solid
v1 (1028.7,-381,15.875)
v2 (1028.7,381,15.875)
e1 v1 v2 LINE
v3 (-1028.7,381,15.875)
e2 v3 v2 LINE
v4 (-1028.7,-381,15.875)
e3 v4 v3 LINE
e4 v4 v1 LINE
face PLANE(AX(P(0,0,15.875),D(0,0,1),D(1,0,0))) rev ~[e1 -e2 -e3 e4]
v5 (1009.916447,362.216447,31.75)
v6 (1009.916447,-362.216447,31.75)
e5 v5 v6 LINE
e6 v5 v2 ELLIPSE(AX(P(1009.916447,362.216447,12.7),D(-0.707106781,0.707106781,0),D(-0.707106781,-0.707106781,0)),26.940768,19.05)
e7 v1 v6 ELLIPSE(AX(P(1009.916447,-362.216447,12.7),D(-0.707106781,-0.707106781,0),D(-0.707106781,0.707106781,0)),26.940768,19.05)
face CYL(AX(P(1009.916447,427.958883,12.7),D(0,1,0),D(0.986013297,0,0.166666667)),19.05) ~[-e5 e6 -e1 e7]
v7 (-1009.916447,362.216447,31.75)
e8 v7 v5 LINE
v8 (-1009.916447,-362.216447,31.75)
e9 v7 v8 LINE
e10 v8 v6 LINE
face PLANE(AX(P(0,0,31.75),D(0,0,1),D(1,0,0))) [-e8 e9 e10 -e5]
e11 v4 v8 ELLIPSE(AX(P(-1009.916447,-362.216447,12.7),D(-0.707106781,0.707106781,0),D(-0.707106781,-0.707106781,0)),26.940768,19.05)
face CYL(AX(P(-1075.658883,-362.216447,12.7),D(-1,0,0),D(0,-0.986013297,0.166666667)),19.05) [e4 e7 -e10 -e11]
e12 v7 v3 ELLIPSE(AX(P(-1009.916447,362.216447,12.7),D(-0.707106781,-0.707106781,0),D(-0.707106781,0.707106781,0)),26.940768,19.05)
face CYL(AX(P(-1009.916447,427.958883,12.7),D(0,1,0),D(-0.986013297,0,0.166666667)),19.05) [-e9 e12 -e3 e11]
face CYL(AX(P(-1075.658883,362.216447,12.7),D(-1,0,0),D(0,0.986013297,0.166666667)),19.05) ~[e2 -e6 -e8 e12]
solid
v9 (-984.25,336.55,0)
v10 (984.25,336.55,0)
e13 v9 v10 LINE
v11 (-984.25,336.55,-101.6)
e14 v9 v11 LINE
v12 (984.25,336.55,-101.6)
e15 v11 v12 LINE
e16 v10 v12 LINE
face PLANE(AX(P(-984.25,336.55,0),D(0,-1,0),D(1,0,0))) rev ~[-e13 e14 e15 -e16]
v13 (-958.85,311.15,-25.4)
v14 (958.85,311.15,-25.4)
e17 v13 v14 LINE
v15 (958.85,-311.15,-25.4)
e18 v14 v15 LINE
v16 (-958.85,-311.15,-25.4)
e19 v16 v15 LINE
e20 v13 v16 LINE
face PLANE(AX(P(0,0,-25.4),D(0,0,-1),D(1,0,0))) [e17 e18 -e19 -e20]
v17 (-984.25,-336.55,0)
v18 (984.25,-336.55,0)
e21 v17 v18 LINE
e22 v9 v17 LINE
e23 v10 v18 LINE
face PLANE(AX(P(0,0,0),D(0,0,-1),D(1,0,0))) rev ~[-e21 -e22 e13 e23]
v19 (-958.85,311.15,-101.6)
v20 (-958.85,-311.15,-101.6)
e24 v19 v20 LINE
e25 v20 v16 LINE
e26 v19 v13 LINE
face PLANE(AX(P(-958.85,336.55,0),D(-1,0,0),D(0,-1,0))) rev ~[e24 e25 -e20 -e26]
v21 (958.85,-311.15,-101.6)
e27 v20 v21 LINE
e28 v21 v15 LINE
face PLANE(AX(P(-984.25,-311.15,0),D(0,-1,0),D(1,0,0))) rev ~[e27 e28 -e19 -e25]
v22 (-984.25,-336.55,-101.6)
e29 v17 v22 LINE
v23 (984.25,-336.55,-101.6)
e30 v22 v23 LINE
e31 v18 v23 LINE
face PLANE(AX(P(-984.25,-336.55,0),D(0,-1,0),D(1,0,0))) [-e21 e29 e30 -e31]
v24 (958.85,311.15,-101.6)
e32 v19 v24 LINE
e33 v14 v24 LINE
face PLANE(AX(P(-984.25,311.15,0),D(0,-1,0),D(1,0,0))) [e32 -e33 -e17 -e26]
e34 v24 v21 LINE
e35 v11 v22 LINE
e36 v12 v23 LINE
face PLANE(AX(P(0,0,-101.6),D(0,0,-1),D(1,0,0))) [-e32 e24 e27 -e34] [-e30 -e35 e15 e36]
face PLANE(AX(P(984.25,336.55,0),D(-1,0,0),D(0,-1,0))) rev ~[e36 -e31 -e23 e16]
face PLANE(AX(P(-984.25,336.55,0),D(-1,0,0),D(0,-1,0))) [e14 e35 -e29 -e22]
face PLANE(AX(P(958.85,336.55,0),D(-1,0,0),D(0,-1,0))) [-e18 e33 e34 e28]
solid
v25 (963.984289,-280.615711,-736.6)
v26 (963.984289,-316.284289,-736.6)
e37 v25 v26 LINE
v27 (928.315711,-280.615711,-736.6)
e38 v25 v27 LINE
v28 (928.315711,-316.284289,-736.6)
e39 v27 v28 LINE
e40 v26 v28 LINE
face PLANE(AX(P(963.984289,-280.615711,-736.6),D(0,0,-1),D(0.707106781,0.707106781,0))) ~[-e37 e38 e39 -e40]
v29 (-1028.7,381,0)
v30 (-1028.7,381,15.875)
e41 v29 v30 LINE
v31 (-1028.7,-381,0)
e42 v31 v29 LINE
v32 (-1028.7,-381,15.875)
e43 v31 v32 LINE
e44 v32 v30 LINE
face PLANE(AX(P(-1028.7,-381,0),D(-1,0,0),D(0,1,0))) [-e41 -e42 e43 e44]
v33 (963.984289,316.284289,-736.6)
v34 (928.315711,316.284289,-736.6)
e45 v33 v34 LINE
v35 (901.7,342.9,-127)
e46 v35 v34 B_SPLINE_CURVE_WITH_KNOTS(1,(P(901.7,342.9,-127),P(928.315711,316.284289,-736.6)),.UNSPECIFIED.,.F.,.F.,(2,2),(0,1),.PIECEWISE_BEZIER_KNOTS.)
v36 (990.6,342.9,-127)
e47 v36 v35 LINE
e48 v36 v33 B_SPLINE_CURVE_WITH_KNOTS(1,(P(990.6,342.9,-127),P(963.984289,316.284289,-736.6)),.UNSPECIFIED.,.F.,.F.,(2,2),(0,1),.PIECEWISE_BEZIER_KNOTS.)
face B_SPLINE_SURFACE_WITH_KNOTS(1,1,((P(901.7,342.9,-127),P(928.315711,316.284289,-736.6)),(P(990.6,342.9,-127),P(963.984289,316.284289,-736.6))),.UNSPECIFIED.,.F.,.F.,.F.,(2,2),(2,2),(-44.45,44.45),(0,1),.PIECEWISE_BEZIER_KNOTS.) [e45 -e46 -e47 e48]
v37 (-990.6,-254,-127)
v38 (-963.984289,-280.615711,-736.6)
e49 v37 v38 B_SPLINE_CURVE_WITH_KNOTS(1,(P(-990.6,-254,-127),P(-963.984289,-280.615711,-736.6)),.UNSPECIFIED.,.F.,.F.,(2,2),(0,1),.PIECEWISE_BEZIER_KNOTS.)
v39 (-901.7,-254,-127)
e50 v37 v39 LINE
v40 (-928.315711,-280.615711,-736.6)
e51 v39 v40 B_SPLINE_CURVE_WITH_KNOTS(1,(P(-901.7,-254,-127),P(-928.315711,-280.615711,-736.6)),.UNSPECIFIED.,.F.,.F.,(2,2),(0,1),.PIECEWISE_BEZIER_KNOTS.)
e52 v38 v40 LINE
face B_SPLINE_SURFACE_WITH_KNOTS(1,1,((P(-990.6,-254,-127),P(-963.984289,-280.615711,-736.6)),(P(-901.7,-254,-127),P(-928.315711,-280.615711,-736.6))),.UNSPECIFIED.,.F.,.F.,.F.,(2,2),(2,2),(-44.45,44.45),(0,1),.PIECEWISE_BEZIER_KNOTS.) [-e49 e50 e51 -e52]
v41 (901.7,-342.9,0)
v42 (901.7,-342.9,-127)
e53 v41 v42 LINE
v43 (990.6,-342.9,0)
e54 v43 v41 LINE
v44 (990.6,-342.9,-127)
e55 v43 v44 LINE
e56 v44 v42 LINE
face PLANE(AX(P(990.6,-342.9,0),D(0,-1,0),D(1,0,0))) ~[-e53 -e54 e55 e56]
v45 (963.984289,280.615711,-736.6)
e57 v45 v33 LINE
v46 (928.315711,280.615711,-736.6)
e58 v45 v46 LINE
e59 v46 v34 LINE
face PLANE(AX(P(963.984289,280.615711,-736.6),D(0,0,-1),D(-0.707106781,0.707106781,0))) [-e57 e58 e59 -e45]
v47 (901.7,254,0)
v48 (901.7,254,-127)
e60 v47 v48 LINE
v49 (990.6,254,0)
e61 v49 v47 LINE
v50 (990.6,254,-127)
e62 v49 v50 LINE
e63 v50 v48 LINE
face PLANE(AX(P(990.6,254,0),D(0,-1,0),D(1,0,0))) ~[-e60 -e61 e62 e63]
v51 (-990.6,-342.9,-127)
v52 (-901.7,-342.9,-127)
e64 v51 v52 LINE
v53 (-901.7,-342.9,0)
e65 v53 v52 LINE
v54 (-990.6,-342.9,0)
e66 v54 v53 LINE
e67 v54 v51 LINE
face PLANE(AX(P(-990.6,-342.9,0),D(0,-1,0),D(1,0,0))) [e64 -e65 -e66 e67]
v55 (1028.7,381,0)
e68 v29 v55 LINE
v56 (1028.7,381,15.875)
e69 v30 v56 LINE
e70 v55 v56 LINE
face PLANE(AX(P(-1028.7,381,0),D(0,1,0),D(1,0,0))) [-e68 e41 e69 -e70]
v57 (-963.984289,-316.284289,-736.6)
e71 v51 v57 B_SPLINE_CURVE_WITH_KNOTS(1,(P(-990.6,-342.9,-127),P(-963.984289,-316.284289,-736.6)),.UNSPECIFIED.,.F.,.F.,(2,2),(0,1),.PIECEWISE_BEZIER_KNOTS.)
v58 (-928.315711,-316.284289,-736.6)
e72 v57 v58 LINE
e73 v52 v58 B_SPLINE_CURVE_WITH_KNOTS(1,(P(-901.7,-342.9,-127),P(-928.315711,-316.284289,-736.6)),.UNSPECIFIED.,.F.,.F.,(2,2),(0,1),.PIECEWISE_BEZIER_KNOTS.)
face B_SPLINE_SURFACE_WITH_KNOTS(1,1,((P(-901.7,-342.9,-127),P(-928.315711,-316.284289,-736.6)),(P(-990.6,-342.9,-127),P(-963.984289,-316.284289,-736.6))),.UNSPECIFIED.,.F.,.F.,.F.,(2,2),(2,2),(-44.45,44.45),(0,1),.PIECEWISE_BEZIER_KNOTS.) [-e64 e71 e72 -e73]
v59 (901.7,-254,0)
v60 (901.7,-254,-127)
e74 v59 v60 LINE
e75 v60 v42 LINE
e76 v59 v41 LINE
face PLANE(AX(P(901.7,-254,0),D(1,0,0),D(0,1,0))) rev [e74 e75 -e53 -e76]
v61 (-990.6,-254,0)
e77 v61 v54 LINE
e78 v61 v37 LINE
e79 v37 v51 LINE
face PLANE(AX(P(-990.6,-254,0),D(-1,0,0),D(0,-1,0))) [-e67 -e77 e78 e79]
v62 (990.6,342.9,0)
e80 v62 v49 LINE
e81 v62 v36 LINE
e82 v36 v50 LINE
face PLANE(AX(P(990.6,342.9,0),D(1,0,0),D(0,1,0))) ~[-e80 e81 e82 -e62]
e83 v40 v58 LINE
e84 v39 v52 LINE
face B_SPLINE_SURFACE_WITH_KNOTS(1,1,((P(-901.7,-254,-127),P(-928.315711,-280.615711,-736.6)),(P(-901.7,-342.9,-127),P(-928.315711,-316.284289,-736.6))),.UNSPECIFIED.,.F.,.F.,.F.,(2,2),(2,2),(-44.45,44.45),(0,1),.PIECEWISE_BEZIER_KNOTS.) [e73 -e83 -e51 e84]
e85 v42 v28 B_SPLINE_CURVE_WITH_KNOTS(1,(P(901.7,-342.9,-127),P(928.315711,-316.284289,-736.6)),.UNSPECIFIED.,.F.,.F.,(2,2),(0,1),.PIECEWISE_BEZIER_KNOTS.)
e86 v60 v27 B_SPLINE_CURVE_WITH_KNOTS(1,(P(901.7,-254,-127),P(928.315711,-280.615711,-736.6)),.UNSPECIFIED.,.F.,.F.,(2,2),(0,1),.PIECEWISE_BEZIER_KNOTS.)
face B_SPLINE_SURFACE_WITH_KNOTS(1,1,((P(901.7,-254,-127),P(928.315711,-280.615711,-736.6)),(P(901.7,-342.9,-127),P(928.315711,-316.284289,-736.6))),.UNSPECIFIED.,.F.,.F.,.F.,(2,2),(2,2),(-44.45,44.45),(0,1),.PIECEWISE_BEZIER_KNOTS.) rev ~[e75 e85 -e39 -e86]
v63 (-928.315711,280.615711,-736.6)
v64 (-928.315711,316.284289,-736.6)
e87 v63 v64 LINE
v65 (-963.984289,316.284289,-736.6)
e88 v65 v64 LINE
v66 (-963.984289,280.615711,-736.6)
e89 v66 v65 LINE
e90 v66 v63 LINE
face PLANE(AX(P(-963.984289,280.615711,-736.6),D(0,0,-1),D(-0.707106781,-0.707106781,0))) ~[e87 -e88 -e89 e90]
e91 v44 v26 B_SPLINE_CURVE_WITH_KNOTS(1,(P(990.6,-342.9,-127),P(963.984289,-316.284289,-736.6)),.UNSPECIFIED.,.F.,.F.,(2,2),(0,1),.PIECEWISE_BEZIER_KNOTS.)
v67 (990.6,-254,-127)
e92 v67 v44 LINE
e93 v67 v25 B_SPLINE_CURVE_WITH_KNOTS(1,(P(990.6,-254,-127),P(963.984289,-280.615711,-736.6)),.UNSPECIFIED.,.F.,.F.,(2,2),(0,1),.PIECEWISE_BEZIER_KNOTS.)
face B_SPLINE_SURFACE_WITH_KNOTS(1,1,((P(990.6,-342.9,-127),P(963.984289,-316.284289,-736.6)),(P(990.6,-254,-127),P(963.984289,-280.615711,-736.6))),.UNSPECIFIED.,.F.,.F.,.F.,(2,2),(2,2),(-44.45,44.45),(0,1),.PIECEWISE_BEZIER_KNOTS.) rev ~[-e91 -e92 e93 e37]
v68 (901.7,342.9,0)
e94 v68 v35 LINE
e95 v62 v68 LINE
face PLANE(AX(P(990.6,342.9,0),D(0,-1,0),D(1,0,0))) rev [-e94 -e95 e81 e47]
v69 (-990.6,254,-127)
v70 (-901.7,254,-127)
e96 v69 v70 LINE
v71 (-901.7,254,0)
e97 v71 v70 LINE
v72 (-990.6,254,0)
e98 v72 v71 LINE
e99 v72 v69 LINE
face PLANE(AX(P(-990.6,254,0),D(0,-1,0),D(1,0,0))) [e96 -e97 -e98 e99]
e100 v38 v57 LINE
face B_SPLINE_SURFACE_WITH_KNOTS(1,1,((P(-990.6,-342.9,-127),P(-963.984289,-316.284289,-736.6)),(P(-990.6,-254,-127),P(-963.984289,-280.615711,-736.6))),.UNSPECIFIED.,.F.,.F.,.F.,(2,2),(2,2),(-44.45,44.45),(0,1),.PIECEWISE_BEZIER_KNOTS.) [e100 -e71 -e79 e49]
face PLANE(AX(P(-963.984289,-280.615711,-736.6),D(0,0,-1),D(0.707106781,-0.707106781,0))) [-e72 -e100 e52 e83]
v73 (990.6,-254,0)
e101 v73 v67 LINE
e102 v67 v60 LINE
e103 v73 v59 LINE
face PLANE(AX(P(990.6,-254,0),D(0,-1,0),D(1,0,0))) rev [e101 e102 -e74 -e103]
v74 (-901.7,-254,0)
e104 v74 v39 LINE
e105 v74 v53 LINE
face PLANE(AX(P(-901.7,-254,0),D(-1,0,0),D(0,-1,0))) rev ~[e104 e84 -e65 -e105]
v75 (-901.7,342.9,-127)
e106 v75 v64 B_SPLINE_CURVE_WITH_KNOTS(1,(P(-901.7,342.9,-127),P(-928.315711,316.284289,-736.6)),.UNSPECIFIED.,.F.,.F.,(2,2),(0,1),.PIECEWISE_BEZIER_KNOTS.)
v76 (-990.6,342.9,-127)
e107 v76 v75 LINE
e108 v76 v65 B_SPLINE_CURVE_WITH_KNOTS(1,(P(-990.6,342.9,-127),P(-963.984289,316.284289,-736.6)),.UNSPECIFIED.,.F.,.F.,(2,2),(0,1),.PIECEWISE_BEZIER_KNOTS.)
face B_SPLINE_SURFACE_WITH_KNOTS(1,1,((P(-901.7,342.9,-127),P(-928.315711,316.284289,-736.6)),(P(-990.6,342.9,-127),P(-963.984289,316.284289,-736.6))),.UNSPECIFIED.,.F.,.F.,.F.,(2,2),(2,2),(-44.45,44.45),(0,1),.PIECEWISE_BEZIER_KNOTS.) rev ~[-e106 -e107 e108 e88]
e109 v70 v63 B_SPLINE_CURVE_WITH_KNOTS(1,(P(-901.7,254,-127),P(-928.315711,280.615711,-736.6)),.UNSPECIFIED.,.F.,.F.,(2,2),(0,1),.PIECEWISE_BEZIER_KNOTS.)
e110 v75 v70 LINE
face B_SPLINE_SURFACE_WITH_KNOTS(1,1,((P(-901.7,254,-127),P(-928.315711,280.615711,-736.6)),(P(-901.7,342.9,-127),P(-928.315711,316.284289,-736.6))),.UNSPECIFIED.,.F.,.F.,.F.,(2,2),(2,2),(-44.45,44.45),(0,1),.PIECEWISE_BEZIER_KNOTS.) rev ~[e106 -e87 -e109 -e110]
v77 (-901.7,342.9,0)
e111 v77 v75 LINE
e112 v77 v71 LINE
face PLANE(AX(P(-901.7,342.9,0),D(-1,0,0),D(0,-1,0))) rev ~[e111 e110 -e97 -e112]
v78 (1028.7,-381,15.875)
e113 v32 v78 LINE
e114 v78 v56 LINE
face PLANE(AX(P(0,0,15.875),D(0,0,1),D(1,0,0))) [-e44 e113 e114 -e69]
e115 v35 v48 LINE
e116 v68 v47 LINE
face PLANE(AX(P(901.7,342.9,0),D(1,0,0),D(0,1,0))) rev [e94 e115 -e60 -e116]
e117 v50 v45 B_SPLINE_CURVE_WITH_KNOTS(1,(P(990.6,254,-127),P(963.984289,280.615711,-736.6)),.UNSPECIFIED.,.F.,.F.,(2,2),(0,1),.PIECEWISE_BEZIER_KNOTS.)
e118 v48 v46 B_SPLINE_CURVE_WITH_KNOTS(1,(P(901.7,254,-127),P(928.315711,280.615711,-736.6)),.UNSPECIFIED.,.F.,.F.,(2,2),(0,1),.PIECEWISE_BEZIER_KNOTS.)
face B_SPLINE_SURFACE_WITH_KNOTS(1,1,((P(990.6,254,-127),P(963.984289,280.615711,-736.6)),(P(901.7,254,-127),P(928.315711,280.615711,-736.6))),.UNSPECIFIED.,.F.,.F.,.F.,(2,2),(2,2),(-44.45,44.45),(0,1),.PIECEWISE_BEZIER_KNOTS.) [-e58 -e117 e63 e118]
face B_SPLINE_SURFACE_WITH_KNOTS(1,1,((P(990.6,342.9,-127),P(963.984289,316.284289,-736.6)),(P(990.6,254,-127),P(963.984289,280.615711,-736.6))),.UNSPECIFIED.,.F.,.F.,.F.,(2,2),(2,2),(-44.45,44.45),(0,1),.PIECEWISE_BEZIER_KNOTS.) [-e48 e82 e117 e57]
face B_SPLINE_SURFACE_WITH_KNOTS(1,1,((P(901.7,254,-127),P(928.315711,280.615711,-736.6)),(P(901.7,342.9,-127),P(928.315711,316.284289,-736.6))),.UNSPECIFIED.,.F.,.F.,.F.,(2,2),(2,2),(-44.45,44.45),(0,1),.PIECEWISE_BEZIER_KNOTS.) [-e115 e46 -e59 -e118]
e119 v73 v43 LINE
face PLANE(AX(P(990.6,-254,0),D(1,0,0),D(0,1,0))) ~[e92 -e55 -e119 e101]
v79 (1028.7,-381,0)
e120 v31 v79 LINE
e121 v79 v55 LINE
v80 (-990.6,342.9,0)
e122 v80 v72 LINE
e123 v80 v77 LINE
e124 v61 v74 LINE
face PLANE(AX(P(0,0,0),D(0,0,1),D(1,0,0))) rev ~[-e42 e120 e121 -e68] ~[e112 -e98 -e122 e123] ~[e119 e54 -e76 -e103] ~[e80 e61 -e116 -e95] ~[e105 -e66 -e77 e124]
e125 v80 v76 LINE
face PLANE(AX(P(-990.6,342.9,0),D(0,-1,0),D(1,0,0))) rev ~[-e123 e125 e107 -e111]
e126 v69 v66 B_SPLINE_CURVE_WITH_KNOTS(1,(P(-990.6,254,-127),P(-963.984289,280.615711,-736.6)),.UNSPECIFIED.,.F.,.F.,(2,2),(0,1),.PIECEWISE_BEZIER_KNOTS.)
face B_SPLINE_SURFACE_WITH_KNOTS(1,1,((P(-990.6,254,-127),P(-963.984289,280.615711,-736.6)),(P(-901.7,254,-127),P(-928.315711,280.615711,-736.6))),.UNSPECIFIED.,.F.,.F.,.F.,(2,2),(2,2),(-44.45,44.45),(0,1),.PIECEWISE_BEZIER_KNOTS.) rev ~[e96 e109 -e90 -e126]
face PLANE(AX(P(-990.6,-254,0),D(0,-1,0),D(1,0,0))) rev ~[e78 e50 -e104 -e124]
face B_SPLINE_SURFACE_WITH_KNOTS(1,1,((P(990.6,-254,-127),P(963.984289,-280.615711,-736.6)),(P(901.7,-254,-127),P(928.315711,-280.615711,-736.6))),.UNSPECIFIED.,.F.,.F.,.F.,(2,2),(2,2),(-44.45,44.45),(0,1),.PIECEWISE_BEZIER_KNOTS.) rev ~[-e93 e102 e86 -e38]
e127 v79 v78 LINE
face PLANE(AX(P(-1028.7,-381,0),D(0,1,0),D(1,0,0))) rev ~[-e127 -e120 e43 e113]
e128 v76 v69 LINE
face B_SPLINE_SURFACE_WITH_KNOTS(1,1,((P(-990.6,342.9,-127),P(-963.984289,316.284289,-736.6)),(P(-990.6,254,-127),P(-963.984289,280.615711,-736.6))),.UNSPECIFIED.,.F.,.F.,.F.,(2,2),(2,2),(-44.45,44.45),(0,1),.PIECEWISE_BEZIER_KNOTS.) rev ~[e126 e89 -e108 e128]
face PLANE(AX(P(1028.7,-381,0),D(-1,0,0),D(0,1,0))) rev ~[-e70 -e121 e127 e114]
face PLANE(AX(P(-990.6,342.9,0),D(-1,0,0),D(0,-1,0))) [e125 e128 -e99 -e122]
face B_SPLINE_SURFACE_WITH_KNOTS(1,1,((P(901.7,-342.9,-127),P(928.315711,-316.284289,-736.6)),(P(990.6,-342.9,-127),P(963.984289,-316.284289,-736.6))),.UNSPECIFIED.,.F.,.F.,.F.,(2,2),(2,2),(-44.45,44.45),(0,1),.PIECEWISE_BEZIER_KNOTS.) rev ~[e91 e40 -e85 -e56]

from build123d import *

# Parameters (mm, degrees)
F0_W        = 2057.4
F0_H        = 762
F1_DEPTH    = 15.875
F2_W        = 2057.4
F2_H        = 762
F3_DEPTH    = 15.875
F4_T1_DEPTH = 2151.3177665567
F4_T3_DEPTH = 855.9177665567
F6_W        = 88.9
F6_H        = 88.9
F7_DEPTH    = 127
F9_W        = 1968.5
F9_H        = 673.1
F10_DEPTH   = 101.6
F11_T       = -25.4
F12_W       = 88.9
F12_H       = 88.9
F13_DEPTH   = 609.6
F13_TAPER   = 2.5


# Not quite as in the source:
# - a fillet or chamfer that OpenCascade refuses, or shapes differently, is made with other operations: its cross-section is extruded or revolved along the edge and cut away or added


with BuildPart() as f1:
    # F0 (on Top) → F1 (new body)
    with BuildSketch(Plane.XY):
        Rectangle(F0_W, F0_H)
    extrude(amount=F1_DEPTH)

    # F6 (on face) → F7 (join)
    with BuildSketch(Plane(origin=(0, 0, 0), x_dir=(1, 0, 0), z_dir=(0, 0, -1))):
        with Locations((-946.15, 298.45)):
            Rectangle(F6_W, F6_H)
        with Locations((-946.15, -298.45)):
            Rectangle(F6_W, F6_H)
    extrude(amount=F7_DEPTH)

    # F8: F1 across plane


with BuildPart() as f3:
    # F2 (on face) → F3 (new body)
    with BuildSketch(Plane.XY.offset(15.875)):
        Rectangle(F2_W, F2_H)
    extrude(amount=F3_DEPTH)

    # F4: fillet of radius 19.05 on 4 edges, made by hand

    # F4_s2 → F4_t1 (cut)
    with BuildSketch(Plane.YZ.offset(-1075.6588832784)):
        with BuildLine():
            ThreePointArc((-381, 15.875), (-374.5131688129, 27.2496778315), (-362.2164466887, 31.75))
            Line((-362.2164466887, 31.75), (-381, 31.75))
            Line((-381, 31.75), (-381, 15.875))
        make_face()
        with BuildLine():
            ThreePointArc((381, 15.875), (374.5131688129, 27.2496778315), (362.2164466887, 31.75))
            Line((362.2164466887, 31.75), (381, 31.75))
            Line((381, 31.75), (381, 15.875))
        make_face()
    extrude(amount=F4_T1_DEPTH, mode=Mode.SUBTRACT)

    # F4_s4 → F4_t3 (cut)
    with BuildSketch(Plane.XZ.offset(-427.9588832784)):
        with BuildLine():
            ThreePointArc((-1028.7, 15.875), (-1022.2131688129, 27.2496778315), (-1009.9164466887, 31.75))
            Line((-1009.9164466887, 31.75), (-1028.7, 31.75))
            Line((-1028.7, 31.75), (-1028.7, 15.875))
        make_face()
        with BuildLine():
            ThreePointArc((1028.7, 15.875), (1022.2131688129, 27.2496778315), (1009.9164466887, 31.75))
            Line((1009.9164466887, 31.75), (1028.7, 31.75))
            Line((1028.7, 31.75), (1028.7, 15.875))
        make_face()
    extrude(amount=F4_T3_DEPTH, mode=Mode.SUBTRACT)


with BuildPart() as f1_1:
    add(f1.part)
    add(f1.part.mirror(Plane.YZ))

    # F12 (on face) → F13 (join)
    with BuildSketch(Plane(origin=(0, 0, -127), x_dir=(1, 0, 0), z_dir=(0, 0, -1))):
        with Locations((-946.15, 298.45)):
            Rectangle(F12_W, F12_H)
    extrude(amount=F13_DEPTH, taper=F13_TAPER)


with BuildPart() as f10:
    # F9 (on face) → F10 (new body)
    with BuildSketch(Plane(origin=(0, 0, 0), x_dir=(1, 0, 0), z_dir=(0, 0, -1))):
        Rectangle(F9_W, F9_H)
    extrude(amount=F10_DEPTH)

    # F11
    f11_openings = [f10.faces().sort_by_distance(p)[0] for p in [
        (0, 0, -101.6),
    ]]
    offset(amount=F11_T, openings=f11_openings)


with BuildPart() as f14_1:
    # F14: instance of F1
    add(f1_1.part.mirror(Plane.XZ))


with BuildPart() as f1_2:
    add(f1_1.part)

    add(f14_1.part)  # F15 merges F14_1
    # F15: F1, F14_1 across plane
    add(f1_1.part.mirror(Plane.YZ))
    add(f14_1.part.mirror(Plane.YZ))


solid = Compound([f3.part, f10.part, f1_2.part])
